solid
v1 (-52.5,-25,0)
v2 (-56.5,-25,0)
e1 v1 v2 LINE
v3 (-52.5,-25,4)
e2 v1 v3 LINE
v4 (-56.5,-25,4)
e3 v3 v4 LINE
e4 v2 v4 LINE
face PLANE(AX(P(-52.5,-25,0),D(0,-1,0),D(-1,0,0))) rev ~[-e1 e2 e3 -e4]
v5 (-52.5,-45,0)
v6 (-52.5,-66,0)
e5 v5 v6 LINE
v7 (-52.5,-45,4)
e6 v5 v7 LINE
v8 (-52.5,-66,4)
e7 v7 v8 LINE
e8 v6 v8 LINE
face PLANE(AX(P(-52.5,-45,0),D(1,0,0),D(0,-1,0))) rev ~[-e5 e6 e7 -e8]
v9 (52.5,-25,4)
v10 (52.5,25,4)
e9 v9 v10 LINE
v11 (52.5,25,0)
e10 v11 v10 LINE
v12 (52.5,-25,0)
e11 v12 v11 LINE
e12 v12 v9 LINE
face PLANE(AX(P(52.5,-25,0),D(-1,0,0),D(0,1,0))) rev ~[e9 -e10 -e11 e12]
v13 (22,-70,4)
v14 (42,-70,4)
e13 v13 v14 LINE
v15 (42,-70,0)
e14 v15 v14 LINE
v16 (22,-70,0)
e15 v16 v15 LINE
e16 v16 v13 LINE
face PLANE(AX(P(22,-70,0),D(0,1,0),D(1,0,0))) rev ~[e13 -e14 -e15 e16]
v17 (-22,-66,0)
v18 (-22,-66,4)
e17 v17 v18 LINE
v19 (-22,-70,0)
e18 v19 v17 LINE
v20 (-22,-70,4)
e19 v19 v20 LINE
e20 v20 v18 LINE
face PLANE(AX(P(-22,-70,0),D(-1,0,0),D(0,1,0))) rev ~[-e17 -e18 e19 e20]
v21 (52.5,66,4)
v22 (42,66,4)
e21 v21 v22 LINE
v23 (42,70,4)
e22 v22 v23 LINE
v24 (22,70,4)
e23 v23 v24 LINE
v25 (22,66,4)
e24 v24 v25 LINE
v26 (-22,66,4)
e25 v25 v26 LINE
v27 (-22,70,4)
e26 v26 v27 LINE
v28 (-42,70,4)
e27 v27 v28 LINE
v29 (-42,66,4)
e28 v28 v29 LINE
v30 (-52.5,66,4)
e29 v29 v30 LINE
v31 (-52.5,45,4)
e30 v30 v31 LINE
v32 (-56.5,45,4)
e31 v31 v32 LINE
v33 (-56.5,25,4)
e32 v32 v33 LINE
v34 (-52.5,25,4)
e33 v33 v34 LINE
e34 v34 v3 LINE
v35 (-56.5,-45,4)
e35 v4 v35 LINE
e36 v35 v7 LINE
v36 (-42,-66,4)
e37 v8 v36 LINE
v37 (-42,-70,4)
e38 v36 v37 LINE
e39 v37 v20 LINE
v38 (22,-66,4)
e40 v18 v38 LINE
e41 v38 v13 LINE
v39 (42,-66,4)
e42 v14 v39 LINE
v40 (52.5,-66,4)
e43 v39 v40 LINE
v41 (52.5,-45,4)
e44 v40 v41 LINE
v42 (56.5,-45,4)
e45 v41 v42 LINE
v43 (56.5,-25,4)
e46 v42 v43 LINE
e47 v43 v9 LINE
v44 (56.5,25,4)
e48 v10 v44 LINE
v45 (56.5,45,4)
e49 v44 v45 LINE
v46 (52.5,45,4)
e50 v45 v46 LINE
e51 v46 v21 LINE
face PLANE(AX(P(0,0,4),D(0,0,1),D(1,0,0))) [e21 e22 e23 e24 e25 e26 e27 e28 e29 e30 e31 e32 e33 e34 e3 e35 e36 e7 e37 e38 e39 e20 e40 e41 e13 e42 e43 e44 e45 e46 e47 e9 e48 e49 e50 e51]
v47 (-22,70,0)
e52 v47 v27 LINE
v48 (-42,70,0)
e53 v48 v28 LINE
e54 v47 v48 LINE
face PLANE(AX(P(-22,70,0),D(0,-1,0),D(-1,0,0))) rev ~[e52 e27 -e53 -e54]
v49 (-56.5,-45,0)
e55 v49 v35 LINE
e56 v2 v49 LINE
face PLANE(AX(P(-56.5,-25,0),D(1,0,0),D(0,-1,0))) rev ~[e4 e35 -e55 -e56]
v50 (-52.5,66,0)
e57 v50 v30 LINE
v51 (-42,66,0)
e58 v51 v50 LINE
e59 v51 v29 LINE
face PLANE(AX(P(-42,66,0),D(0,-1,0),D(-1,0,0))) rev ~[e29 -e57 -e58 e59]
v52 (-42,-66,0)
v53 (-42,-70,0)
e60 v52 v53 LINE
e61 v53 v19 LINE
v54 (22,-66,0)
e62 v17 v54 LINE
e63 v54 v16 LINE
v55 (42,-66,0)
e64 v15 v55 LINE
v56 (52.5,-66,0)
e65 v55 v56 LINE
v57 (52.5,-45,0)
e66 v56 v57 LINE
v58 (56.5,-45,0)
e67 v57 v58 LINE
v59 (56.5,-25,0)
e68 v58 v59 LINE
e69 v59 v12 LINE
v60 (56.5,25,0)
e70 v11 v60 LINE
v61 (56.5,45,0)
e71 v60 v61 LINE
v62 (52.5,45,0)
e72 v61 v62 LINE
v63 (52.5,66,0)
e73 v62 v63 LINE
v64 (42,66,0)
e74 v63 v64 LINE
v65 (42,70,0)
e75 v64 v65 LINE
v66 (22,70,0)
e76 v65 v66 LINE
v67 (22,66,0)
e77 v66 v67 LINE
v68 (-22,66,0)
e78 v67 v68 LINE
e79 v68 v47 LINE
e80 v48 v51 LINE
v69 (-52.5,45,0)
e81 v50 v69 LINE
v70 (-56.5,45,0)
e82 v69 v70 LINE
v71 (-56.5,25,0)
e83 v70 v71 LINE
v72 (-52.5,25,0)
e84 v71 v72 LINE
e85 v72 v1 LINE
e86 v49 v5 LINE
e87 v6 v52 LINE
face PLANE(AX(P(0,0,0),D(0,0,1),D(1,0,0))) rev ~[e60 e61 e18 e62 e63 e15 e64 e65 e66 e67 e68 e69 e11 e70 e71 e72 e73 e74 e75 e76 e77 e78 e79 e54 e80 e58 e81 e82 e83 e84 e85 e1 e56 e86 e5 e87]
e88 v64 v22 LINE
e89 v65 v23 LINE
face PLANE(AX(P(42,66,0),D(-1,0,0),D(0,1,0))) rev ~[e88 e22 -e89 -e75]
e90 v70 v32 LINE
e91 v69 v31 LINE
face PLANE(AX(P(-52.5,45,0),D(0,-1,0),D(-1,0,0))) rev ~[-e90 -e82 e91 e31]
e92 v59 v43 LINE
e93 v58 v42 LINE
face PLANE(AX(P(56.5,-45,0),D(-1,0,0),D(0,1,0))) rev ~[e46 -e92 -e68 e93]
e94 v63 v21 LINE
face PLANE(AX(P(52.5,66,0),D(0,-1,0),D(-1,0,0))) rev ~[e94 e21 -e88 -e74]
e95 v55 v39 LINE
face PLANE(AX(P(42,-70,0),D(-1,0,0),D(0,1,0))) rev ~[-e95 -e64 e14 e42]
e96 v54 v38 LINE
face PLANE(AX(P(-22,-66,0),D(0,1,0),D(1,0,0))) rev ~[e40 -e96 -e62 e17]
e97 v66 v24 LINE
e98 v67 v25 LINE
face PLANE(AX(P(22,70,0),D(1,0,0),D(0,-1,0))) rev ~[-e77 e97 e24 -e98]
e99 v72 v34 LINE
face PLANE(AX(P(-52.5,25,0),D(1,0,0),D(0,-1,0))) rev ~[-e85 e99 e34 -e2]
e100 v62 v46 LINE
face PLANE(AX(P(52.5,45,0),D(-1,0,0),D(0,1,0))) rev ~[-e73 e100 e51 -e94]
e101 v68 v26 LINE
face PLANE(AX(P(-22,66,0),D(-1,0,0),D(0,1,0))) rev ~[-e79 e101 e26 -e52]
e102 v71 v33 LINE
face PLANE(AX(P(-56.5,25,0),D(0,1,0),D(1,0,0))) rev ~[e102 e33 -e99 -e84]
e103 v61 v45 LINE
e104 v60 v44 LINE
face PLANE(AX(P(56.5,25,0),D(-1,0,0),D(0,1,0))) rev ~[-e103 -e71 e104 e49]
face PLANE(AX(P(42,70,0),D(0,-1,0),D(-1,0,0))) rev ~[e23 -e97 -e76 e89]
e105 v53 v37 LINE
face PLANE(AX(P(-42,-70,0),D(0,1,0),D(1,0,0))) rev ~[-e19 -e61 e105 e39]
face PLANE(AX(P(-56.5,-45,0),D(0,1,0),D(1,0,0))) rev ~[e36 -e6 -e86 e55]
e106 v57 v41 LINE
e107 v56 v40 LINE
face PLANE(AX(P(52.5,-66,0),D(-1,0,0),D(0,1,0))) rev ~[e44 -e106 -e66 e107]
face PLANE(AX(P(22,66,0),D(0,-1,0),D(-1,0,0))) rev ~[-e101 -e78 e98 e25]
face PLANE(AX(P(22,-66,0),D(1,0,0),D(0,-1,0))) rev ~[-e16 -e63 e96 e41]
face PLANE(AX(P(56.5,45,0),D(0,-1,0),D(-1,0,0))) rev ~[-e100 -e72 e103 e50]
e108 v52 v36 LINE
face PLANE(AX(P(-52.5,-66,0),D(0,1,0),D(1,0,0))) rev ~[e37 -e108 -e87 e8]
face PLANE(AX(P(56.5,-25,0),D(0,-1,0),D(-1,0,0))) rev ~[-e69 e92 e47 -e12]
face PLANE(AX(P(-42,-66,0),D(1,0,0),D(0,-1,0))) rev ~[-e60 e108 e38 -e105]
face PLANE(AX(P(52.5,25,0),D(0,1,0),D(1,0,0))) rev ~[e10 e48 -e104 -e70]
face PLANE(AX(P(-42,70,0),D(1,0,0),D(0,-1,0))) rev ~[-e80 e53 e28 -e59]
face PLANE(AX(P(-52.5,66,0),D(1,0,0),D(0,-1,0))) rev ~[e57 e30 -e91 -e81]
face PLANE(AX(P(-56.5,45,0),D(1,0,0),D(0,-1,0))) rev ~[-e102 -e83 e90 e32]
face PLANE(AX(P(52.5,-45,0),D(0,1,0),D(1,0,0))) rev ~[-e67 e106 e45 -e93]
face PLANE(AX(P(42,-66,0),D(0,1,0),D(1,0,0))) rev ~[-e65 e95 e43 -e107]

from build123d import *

# Parameters (mm, degrees)
F1_DEPTH = 4


# Not quite as in the source:
# - a feature names something its author has since deleted; it is built from what else it names


with BuildPart() as f1:
    # F0 (on Top) → F1 (new body)
    with BuildSketch(Plane.XY):
        Polygon((52.5, 45), (52.5, 66), (42, 66), (42, 70), (22, 70), (22, 66), (-22, 66), (-22, 70), (-42, 70), (-42, 66), (-52.5, 66), (-52.5, 45), (-56.5, 45), (-56.5, 25), (-52.5, 25), (-52.5, -25), (-56.5, -25), (-56.5, -45), (-52.5, -45), (-52.5, -66), (-42, -66), (-42, -70), (-22, -70), (-22, -66), (22, -66), (22, -70), (42, -70), (42, -66), (52.5, -66), (52.5, -45), (56.5, -45), (56.5, -25), (52.5, -25), (52.5, 25), (56.5, 25), (56.5, 45), align=None)
    extrude(amount=F1_DEPTH)


solid = f1.part
